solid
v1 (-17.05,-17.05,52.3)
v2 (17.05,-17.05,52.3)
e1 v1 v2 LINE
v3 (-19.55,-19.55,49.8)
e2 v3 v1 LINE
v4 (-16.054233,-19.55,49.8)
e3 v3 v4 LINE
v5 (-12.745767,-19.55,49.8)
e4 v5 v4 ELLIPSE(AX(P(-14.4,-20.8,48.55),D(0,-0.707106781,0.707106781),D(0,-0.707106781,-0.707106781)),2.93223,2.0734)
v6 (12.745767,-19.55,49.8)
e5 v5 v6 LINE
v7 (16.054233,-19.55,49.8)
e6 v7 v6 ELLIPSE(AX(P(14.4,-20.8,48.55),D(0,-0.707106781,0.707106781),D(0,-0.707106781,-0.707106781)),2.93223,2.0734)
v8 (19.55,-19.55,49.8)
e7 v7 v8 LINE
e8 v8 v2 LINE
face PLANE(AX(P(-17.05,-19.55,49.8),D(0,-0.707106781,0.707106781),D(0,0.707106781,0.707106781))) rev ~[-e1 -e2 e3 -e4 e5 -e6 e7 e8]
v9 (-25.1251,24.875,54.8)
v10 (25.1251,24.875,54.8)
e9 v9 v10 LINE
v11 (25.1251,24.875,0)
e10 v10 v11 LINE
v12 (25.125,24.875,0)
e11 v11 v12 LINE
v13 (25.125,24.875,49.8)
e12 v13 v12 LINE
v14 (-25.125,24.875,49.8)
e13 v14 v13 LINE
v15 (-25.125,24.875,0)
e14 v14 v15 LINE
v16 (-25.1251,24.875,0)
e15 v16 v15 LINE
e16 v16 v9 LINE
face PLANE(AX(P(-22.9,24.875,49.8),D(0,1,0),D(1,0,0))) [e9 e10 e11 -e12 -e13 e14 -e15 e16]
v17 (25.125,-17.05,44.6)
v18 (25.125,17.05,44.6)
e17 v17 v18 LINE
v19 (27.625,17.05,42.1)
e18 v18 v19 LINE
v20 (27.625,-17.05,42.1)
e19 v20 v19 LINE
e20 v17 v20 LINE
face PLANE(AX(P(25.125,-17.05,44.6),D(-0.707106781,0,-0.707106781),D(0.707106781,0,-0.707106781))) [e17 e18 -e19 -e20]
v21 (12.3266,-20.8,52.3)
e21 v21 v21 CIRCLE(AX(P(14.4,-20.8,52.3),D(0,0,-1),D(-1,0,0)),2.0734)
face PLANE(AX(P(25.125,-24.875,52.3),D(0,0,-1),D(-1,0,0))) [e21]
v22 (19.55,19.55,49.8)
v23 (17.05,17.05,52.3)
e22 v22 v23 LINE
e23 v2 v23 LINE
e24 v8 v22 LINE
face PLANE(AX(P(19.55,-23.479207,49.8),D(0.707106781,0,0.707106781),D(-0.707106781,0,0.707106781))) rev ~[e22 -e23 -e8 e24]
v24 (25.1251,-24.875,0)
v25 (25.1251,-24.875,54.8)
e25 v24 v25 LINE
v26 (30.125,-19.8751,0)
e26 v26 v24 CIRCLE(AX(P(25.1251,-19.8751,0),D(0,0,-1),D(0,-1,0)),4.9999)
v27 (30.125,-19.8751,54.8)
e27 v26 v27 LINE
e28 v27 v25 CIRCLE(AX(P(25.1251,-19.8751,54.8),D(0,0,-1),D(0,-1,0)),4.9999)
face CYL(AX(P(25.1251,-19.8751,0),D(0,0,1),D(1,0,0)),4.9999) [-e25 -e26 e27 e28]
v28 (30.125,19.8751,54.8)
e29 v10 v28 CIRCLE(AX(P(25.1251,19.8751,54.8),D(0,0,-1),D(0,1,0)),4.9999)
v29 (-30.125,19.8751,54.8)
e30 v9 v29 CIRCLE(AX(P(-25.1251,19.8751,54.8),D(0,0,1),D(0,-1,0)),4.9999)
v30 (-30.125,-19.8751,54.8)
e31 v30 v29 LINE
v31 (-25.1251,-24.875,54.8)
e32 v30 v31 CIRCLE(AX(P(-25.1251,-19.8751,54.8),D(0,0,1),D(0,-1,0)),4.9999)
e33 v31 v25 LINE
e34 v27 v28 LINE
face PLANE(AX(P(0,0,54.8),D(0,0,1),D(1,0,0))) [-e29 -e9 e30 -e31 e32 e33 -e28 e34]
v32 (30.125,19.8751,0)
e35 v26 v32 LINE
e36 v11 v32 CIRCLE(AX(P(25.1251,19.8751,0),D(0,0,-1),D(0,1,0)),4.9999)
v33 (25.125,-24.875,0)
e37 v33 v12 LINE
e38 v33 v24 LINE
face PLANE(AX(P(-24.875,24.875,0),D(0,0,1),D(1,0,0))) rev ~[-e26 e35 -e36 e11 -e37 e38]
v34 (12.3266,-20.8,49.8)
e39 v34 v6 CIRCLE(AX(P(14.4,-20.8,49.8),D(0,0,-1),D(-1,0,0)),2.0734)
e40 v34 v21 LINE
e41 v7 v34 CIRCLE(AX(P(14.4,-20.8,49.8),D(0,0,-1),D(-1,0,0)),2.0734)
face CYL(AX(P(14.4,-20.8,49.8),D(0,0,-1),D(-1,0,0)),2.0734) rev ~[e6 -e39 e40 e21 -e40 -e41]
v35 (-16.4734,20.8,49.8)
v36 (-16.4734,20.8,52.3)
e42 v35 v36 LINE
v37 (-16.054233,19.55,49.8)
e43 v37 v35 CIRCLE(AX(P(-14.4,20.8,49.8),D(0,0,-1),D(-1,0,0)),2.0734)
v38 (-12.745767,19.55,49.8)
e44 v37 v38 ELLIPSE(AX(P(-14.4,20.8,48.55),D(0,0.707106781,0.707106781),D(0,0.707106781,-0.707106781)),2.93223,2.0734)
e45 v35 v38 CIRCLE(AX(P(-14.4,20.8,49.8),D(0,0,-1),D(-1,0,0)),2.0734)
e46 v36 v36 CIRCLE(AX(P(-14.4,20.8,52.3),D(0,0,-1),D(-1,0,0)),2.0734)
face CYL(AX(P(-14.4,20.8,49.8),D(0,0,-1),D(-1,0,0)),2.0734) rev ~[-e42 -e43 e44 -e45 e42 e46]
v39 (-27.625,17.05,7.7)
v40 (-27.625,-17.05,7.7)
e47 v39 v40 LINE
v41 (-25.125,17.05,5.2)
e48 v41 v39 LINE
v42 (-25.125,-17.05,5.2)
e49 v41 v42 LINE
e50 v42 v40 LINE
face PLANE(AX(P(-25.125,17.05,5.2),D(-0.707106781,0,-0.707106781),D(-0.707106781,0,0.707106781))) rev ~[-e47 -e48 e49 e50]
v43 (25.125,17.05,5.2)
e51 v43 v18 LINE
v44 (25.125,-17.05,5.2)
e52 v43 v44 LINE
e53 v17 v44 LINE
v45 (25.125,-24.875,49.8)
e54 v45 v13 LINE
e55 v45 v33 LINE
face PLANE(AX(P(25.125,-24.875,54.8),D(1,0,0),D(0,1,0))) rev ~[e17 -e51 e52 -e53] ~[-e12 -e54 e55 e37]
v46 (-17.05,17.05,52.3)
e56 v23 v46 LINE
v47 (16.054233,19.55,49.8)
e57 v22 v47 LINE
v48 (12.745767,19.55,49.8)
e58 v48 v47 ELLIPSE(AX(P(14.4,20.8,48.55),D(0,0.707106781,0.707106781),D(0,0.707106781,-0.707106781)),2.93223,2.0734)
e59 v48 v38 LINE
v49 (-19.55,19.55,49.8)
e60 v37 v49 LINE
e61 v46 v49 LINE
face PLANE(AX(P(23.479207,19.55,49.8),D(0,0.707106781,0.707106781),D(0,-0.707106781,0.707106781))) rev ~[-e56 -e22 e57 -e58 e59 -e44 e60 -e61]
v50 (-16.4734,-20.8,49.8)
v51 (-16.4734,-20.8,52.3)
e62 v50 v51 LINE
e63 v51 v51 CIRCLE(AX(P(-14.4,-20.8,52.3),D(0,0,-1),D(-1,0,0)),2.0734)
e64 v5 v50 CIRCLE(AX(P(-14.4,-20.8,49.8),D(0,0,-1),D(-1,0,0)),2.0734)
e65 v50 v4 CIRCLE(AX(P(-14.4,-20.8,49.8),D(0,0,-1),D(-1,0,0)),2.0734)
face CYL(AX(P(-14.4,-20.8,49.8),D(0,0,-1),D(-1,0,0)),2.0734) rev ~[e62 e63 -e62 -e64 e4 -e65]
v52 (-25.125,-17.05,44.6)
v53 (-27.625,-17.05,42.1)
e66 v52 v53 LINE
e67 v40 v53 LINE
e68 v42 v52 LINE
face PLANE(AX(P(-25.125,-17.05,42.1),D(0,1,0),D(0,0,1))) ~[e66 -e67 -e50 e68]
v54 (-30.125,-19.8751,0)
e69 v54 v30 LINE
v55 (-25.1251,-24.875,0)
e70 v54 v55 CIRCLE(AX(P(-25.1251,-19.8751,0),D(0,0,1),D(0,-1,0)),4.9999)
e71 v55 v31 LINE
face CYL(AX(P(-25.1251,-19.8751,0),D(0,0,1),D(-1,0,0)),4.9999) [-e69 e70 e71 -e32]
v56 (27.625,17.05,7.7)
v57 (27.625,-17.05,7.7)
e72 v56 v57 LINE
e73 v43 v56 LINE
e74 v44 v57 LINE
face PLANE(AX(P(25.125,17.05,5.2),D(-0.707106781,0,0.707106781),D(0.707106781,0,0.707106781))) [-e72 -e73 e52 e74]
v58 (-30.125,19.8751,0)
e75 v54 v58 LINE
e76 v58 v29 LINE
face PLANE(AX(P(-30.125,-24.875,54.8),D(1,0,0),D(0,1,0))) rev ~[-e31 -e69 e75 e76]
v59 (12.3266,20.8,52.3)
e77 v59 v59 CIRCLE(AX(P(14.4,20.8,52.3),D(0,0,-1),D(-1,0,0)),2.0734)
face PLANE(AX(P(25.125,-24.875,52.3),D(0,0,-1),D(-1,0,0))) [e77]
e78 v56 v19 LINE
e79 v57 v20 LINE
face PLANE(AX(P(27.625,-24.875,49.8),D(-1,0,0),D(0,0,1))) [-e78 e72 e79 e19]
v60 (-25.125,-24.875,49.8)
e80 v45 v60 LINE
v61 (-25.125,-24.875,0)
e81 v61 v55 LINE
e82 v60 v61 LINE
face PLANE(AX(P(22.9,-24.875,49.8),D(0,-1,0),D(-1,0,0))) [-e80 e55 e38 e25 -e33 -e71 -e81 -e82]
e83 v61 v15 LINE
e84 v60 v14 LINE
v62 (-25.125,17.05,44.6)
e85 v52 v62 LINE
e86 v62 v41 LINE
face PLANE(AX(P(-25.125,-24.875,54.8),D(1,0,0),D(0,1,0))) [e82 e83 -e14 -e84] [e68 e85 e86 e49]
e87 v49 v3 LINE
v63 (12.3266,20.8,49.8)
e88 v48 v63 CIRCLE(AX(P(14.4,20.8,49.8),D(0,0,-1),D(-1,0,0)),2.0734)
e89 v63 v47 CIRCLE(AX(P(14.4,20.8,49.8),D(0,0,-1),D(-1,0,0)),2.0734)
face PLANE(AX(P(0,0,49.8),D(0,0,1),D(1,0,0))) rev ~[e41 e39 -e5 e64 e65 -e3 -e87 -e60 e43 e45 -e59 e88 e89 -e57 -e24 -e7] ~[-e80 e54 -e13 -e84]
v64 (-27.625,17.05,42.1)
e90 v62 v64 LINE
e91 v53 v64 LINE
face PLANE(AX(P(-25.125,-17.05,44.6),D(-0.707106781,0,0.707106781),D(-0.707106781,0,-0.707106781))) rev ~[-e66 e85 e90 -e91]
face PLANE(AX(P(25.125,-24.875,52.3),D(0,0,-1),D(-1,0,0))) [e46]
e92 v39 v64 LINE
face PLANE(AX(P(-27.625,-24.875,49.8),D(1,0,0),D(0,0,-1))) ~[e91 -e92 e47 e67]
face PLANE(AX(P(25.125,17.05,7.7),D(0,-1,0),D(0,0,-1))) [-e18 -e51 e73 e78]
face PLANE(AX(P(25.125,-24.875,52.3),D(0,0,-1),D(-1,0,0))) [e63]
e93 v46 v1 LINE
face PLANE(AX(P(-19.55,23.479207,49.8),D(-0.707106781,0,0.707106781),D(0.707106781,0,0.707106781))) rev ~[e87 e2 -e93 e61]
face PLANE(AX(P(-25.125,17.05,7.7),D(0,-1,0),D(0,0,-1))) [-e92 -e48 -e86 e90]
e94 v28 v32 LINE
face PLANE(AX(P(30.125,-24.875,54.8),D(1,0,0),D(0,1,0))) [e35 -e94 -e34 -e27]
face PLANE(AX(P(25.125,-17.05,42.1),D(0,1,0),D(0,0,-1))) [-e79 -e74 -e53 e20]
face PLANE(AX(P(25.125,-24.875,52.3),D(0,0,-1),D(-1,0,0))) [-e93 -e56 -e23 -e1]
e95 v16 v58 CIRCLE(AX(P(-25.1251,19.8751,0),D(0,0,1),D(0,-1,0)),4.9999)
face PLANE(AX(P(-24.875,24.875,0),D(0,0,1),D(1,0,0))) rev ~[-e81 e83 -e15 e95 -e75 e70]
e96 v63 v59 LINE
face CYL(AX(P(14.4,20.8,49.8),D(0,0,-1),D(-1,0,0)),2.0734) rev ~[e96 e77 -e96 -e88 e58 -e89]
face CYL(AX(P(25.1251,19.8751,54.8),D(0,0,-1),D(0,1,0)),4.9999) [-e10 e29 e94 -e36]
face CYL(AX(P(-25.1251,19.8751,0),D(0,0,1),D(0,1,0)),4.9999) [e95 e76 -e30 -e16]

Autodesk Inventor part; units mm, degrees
ref_plane "YZ Plane" through (0, 0, 0) normal (1, 0, 0) x (0, 1, 0)
sketch "Sketch1" plane through (0, 0, 0) normal (0, 0, 1) x (1, 0, 0)
  circle A0 centre (-21.9, -21.9) radius 1.875 projected
  circle A1 centre (21.9, 21.9) radius 1.875 projected
  circle A2 centre (21.9, -21.9) radius 1.875 projected
  circle A3 centre (-21.9, 21.9) radius 1.875 projected
  circle A4 centre (14.4, 20.8) radius 2.0734 projected
  circle A5 centre (-14.4, -20.8) radius 2.0734 projected
  circle A6 centre (14.4, -20.8) radius 2.0734 projected
  circle A7 centre (20.8, -14.4) radius 2.0734 projected
  line L0 (-17.05, 17.05) -> (-17.05, -17.05) projected
  line L1 (17.05, 17.05) -> (-17.05, 17.05) projected
  line L2 (17.05, -17.05) -> (17.05, 17.05) projected
  line L3 (-17.05, -17.05) -> (17.05, -17.05) projected
  circle A8 centre (20.8, 14.4) radius 2.0734 projected
  circle A9 centre (-14.4, 20.8) radius 2.0734 projected
  circle A10 centre (-20.8, -14.4) radius 2.0734 projected
  circle A11 centre (-20.8, 14.4) radius 2.0734 projected
  line L4 (-22.9, 24.875) -> (22.9, 24.875) projected
  arc A12 (-22.9, 24.875) -> (-24.875, 22.9) centre (-22.9, 22.9) ccw projected
  line L5 (-24.875, -22.9) -> (-24.875, 22.9) projected
  arc A13 (-24.875, -22.9) -> (-22.9, -24.875) centre (-22.9, -22.9) ccw projected
  line L6 (22.9, -24.875) -> (-22.9, -24.875) projected
  arc A14 (22.9, -24.875) -> (24.875, -22.9) centre (22.9, -22.9) ccw projected
  line L7 (24.875, 22.9) -> (24.875, -22.9) projected
  arc A15 (24.875, 22.9) -> (22.9, 24.875) centre (22.9, 22.9) ccw projected
  line L8 (-24.875, 24.875) -> (24.875, 24.875)
  line L9 (24.875, 24.875) -> (24.875, -24.875)
  line L10 (24.875, -24.875) -> (-24.875, -24.875)
  line L11 (-24.875, -24.875) -> (-24.875, 24.875)
  line L12 (-24.875, 24.875) -> (24.875, -24.875) construction
  line L13 (24.875, 24.875) -> (-24.875, -24.875) construction
  point P0 (0, 0)
ref_plane "Work Plane1" through (-24.875, -24.875, 49.8) normal (0, 0, 1) x (1, 0, 0)
extrude "Extrusion1" add sketch "Sketch1" along normal blind 5 from surface at 49.8 contours A0 | A1 | A2 | A3 | A4 | A5 | A6 | A7 | L1 L2 L3 L0 | A8 | A9 | A10 | A11 | L4 A15 L7 A14 L6 A13 L5 A12 | A12 L11 L8 | L8 L9 A15 | A13 L10 L11 | L9 L10 A14
sketch "Sketch2" plane through (-24.875, 24.875, 54.8) normal (0, 0, 1) x (1, 0, 0)
  line L0 (49.75, 0) -> (49.75, -49.75) projected
  line L1 (0, 0) -> (49.75, 0) projected
  line L2 (0, -49.75) -> (0, 0) projected
  line L3 (49.75, -49.75) -> (0, -49.75) projected
  line L4 (49.75, -49.75) -> (50, -49.75)
  line L5 (50, -49.75) -> (50, 0)
  line L6 (50, 0) -> (49.75, 0)
  line L7 (49.75, 0) -> (49.75, -49.75)
  line L8 (50, -49.75) -> (55, -49.75)
  line L9 (55, -49.75) -> (55, 0)
  line L10 (55, 0) -> (50, 0)
  line L11 (50, 0) -> (50, -49.75)
  line L12 (24.875, -49.75) -> (24.875, 0)
  line L13 (0, 0) -> (0, -49.75)
  line L14 (0, -49.75) -> (-0.25, -49.75)
  line L15 (-0.25, -49.75) -> (-0.25, 0)
  line L16 (-0.25, 0) -> (0, 0)
  line L17 (0, 0) -> (0, -49.75)
  line L18 (-0.25, -49.75) -> (-5.25, -49.75)
  line L19 (-5.25, -49.75) -> (-5.25, 0)
  line L20 (-5.25, 0) -> (-0.25, 0)
  line L21 (-0.25, 0) -> (-0.25, -49.75)
  point P0 (24.875, -24.875)
  point P1 (-0.25, 0)
  point P2 (50, 0)
  point P3 (50, 0)
  point P4 (-0.25, 0)
  dimension "d2" = 0.25
  dimension "d3" = 49.75
  dimension "d4" = 5
  dimension "d5" = 49.75
extrude "Extrusion2" add sketch "Sketch2" against normal blind 5 contours L6 L5 L4 L0 | L10 L9 L8 L5 | L2 L14 L15 L16 | L15 L18 L19 L20
ref_plane "Work Plane2" through (-24.875, -24.875, 0) normal (0, 0, -1) x (0, 1, 0)
extrude "Extrusion3" add sketch "Sketch2" against normal up to surface (54.8 mm away) contours L10 L9 L8 L5 | L15 L18 L19 L20
sketch "Sketch3" plane through (25.125, -24.875, 49.8) normal (-1, 0, 0) x (0, 0, 1)
  line L0 (-7.7, 7.825) -> (-42.1, 7.825) projected
  line L1 (-42.1, 41.925) -> (-7.7, 41.925) projected
  line L2 (-24.9, 7.825) -> (-24.9, 41.925)
  line L3 (-42.1, 7.825) -> (-7.7, 7.825)
  line L4 (-7.7, 7.825) -> (-7.7, 41.925)
  line L5 (-7.7, 41.925) -> (-42.1, 41.925)
  line L6 (-42.1, 41.925) -> (-42.1, 7.825)
  line L7 (-42.1, 7.825) -> (-7.7, 41.925) construction
  line L8 (-7.7, 7.825) -> (-42.1, 41.925) construction
  point P0 (-49.8, 24.875)
  point P1 (-24.9, 24.875)
extrude "Extrusion4" cut sketch "Sketch3" against normal blind 2.5
mirror "Mirror1" about plane through (0, 0, 0) normal (1, 0, 0) of "Extrusion4"
sketch "Sketch4" plane through (25.125, -24.875, 49.8) normal (0, 0, -1) x (-1, 0, 0)
  circle A0 centre (47.025, 2.975) radius 1.875 projected
  circle A1 centre (3.225, 46.775) radius 1.875 projected
  circle A2 centre (3.225, 2.975) radius 1.875 projected
  circle A3 centre (47.025, 46.775) radius 1.875 projected
  circle A4 centre (10.725, 45.675) radius 2.0734 projected
  circle A5 centre (39.525, 4.075) radius 2.0734 projected
  circle A6 centre (10.725, 4.075) radius 2.0734 projected
  circle A7 centre (4.325, 10.475) radius 2.0734 projected
  line L0 (42.175, 41.925) -> (42.175, 7.825) projected
  line L1 (8.075, 41.925) -> (42.175, 41.925) projected
  line L2 (8.075, 7.825) -> (8.075, 41.925) projected
  line L3 (42.175, 7.825) -> (8.075, 7.825) projected
  circle A8 centre (4.325, 39.275) radius 2.0734 projected
  circle A9 centre (39.525, 45.675) radius 2.0734 projected
  circle A10 centre (45.925, 10.475) radius 2.0734 projected
  circle A11 centre (45.925, 39.275) radius 2.0734 projected
  line L4 (48.025, 49.75) -> (2.225, 49.75) projected
  arc A12 (50, 47.775) -> (48.025, 49.75) centre (48.025, 47.775) ccw projected
  line L5 (50, 1.975) -> (50, 47.775) projected
  arc A13 (48.025, 0) -> (50, 1.975) centre (48.025, 1.975) ccw projected
  line L6 (2.225, 0) -> (48.025, 0) projected
  arc A14 (0.25, 1.975) -> (2.225, 0) centre (2.225, 1.975) ccw projected
  line L7 (0.25, 47.775) -> (0.25, 1.975) projected
  arc A15 (2.225, 49.75) -> (0.25, 47.775) centre (2.225, 47.775) ccw projected
  point P0 (25.125, 24.875)
extrude "Extrusion5" cut sketch "Sketch4" against normal blind 2.5 contours A4 | A5 | A6 | L0 L3 L2 L1 | A9
chamfer "Chamfer1" distance 2.5 angle 45 8 edges at (-25.125, 0, 42.1) (-25.125, 0, 7.7) (25.125, 0, 42.1) (25.125, 0, 7.7) (0, 17.05, 49.8) (17.05, 0, 49.8) (-17.05, 0, 49.8) (0, -17.05, 49.8)
fillet "Fillet1" radius 5 4 edges at (30.125, -24.875, 27.4) (-30.125, -24.875, 27.4) (-30.125, 24.875, 27.4) (30.125, 24.875, 27.4)
properties part number "Cover Top (Full)"
